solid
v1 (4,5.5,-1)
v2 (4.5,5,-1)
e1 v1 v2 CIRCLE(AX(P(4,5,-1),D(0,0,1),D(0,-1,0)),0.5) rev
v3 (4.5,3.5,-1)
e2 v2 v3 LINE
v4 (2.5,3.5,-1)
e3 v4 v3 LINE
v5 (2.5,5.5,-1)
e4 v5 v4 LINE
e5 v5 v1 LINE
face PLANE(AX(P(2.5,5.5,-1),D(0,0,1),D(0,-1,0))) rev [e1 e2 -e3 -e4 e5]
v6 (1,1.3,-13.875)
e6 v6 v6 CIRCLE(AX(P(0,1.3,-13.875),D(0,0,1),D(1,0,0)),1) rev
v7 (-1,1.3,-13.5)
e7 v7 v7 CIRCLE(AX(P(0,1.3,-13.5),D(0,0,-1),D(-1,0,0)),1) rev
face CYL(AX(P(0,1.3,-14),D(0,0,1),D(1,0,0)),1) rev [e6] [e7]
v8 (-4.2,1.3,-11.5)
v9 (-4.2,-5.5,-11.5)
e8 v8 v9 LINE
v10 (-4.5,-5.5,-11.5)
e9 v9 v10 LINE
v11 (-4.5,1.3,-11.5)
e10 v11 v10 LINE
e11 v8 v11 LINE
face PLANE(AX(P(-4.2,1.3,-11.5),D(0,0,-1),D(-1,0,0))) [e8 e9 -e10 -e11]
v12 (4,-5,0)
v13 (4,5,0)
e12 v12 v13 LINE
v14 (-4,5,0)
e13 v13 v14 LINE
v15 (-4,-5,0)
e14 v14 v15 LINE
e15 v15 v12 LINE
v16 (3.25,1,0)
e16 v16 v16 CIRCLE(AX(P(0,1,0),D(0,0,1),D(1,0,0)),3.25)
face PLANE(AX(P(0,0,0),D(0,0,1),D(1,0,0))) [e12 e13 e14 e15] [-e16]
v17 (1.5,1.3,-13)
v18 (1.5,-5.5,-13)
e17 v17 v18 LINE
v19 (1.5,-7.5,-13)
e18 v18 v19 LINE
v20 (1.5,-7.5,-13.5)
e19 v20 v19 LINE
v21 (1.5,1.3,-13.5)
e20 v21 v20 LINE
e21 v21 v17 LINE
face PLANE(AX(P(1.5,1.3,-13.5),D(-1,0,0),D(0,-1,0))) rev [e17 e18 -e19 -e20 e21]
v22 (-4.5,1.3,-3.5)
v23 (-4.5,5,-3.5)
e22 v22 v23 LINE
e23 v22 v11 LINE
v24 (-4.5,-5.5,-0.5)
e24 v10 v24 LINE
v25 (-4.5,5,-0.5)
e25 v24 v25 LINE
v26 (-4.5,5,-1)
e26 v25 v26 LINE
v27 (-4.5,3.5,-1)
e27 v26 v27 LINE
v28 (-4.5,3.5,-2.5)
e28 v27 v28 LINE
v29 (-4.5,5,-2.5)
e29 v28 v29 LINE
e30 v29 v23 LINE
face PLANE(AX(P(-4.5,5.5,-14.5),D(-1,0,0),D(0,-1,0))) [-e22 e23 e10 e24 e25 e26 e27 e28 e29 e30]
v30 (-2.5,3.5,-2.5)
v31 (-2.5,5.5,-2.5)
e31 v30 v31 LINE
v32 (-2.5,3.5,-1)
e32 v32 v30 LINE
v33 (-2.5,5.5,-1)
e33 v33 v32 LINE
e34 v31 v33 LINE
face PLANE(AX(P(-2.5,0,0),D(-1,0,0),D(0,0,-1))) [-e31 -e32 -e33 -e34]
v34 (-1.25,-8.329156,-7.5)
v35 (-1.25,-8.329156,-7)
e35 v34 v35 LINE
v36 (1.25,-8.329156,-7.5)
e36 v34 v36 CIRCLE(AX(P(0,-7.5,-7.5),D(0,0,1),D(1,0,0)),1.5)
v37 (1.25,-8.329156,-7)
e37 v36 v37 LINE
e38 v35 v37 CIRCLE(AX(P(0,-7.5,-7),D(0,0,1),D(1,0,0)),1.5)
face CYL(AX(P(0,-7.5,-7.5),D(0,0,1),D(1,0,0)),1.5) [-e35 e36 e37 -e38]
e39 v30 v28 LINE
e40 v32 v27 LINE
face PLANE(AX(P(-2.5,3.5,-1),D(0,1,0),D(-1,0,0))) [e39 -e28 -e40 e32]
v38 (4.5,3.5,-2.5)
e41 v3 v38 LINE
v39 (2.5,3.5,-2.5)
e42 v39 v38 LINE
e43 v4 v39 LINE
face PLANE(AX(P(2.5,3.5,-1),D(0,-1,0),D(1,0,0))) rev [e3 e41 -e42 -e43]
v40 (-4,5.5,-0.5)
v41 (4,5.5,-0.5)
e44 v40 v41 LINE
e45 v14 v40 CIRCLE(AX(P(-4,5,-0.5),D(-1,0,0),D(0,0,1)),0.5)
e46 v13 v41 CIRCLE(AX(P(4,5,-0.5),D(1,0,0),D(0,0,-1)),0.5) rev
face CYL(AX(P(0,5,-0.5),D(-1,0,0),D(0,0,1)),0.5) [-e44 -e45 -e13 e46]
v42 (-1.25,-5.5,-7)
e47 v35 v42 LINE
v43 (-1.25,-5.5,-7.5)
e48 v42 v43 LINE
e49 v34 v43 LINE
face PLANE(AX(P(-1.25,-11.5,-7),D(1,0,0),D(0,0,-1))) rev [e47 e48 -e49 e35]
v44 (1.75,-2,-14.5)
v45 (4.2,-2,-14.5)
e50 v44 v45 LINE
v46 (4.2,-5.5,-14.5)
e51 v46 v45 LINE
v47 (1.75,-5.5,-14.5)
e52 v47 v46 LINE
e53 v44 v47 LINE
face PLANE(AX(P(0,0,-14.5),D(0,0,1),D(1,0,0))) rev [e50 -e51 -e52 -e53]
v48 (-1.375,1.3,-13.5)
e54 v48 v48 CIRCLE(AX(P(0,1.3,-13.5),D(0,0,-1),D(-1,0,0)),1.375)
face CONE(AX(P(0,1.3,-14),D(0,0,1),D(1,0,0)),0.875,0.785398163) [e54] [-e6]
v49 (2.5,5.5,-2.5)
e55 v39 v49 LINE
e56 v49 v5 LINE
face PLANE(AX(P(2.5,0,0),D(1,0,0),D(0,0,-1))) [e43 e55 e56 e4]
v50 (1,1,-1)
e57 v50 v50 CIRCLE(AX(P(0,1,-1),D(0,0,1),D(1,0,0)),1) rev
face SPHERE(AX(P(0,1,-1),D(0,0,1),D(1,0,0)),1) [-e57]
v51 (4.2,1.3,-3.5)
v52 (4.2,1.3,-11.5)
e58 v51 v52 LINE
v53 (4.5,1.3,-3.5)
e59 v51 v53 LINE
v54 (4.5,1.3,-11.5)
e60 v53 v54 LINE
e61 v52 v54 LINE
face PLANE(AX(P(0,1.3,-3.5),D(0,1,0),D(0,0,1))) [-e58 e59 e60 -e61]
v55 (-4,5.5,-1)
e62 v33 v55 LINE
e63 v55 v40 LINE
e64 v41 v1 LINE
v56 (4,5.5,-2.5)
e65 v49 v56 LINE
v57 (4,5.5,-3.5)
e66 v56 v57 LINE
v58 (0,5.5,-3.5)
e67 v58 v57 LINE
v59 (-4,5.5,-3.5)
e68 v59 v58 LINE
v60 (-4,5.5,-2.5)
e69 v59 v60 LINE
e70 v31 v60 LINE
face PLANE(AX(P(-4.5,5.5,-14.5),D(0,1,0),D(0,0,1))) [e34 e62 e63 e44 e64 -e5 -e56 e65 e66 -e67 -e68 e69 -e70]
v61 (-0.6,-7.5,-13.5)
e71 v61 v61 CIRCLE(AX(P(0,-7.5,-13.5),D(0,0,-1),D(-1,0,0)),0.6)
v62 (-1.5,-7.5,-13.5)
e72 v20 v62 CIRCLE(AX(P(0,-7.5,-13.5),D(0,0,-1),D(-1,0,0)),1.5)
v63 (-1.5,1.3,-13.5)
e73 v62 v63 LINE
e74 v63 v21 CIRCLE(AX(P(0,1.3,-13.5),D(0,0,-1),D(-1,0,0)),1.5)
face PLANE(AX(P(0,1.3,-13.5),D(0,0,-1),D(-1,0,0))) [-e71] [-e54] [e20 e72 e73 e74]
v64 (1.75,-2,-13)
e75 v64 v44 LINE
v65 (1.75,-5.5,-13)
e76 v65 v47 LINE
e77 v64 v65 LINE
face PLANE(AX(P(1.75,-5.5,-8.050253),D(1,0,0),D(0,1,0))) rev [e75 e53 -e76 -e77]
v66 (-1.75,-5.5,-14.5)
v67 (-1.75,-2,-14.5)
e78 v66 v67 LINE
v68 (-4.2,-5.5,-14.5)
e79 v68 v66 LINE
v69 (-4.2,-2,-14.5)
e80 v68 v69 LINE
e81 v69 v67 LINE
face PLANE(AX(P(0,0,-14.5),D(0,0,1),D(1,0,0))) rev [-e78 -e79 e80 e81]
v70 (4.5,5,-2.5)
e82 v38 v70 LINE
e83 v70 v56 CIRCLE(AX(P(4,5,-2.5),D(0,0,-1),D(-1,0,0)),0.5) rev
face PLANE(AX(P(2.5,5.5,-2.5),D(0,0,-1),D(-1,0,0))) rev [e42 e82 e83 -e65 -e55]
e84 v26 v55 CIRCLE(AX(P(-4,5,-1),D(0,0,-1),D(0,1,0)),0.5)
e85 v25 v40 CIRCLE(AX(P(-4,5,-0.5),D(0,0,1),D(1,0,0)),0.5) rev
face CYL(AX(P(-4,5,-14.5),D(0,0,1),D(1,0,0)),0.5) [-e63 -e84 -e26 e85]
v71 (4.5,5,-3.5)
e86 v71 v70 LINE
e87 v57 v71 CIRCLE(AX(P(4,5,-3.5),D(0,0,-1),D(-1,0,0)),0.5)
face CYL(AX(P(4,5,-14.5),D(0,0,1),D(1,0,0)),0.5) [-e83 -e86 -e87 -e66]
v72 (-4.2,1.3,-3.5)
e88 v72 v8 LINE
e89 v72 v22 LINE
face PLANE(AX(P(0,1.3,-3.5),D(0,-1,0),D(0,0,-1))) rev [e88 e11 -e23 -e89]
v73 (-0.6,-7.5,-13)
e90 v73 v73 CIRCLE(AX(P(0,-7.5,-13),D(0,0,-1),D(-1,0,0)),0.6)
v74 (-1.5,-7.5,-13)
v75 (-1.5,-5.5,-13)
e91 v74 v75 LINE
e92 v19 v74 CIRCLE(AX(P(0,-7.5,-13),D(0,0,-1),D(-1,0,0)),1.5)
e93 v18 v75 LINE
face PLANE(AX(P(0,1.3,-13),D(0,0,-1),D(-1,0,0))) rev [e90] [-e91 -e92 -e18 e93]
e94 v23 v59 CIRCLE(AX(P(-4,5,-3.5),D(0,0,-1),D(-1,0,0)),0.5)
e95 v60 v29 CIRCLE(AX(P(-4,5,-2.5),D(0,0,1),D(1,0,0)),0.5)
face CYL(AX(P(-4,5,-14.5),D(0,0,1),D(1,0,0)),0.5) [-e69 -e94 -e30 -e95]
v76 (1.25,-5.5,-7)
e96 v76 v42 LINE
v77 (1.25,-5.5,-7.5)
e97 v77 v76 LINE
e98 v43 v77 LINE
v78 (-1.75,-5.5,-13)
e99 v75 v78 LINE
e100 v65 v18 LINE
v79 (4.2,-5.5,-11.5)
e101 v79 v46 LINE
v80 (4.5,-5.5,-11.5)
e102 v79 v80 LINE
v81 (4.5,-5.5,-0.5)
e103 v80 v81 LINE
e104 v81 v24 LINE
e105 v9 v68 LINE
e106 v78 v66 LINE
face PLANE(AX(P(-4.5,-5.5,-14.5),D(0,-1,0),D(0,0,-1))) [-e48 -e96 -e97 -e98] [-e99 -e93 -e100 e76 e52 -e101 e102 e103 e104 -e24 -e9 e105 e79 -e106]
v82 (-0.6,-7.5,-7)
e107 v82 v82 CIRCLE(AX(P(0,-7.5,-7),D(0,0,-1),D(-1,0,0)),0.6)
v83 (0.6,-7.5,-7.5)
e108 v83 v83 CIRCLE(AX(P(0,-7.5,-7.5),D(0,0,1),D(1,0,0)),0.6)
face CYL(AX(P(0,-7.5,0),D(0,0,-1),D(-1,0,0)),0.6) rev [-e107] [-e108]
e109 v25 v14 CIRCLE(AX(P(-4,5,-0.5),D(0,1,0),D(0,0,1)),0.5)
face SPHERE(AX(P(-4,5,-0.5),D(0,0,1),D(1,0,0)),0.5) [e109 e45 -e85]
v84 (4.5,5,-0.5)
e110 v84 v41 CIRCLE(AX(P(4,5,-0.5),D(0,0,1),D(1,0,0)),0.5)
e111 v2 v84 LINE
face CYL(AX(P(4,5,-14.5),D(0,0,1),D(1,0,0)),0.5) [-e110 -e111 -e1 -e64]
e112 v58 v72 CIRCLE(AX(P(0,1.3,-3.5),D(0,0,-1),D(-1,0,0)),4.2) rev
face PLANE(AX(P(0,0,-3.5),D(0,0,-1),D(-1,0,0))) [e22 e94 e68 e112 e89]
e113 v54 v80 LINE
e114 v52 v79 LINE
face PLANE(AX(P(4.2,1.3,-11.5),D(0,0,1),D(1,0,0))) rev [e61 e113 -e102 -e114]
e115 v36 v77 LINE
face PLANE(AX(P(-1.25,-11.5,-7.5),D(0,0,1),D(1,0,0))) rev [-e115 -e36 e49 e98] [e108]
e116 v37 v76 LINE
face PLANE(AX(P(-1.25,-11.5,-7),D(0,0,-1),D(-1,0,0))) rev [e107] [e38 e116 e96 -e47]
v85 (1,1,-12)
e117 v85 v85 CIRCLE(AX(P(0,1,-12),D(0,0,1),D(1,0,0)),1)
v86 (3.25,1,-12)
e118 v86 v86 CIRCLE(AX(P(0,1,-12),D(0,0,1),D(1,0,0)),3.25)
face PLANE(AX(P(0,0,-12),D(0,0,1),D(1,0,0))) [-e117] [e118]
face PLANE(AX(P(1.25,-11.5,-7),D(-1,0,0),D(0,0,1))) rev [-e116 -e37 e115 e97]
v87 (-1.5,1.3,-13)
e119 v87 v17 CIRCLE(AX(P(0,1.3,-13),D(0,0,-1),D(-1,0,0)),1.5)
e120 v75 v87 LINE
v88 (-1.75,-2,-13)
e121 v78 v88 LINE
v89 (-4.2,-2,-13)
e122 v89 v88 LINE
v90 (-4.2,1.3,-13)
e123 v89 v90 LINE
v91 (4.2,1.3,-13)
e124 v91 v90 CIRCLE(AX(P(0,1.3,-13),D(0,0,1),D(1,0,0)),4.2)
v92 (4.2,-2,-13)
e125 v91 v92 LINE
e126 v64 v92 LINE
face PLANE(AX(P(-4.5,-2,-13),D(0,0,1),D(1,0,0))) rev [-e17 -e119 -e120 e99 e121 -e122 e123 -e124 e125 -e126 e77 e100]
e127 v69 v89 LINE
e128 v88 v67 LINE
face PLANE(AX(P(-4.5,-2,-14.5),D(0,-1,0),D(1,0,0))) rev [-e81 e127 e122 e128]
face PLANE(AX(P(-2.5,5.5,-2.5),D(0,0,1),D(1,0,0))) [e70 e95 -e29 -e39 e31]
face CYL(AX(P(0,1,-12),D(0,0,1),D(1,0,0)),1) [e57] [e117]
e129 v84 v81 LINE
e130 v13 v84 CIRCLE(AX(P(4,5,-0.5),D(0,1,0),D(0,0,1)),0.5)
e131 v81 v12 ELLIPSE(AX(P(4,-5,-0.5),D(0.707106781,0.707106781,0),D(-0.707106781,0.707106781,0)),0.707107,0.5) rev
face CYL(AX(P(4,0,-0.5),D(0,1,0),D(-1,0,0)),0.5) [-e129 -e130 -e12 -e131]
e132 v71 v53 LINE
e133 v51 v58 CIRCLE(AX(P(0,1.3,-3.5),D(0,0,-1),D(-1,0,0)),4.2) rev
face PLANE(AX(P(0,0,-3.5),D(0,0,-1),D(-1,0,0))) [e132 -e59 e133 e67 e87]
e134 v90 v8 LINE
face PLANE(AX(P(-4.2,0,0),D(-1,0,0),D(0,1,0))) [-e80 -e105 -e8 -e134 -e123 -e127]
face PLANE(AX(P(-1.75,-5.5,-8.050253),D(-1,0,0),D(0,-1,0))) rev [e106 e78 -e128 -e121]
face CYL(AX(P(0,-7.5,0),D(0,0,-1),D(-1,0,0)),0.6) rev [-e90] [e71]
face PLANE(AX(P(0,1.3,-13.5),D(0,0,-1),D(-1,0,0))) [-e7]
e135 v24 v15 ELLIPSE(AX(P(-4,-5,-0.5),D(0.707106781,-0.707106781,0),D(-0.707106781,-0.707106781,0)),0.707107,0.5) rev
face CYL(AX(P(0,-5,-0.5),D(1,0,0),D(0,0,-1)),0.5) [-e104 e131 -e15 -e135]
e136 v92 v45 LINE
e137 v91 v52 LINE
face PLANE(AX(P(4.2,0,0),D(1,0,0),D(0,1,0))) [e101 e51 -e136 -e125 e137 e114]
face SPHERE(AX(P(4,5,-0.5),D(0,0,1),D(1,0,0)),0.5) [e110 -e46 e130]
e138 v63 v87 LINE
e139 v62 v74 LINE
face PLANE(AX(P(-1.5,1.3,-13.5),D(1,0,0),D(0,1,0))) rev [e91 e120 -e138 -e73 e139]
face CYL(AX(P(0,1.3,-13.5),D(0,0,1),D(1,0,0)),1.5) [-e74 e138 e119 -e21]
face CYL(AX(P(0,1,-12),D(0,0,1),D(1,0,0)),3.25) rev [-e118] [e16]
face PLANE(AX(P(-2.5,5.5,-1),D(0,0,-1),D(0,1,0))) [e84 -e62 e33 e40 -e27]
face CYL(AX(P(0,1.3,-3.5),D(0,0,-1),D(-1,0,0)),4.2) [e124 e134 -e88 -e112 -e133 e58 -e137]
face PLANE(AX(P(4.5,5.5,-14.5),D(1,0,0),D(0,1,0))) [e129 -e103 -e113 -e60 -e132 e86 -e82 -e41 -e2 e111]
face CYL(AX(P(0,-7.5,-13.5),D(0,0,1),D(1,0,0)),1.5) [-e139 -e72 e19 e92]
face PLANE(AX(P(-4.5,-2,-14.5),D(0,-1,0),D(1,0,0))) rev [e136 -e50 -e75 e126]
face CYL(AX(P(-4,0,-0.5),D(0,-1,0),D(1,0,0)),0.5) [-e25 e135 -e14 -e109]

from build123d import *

# Parameters (mm, degrees)
SKETCH1_W           = 9
SKETCH1_H           = 11
BOSS_EXTRUDE1_DEPTH = 14.5
CUT_EXTRUDE3_DEPTH  = 11
SKETCH3_W           = 3
SKETCH3_H           = 6.8
CUT_EXTRUDE4_DEPTH  = 0.3
SKETCH5_W           = 1.5
SKETCH5_H           = 7.5
CUT_EXTRUDE5_DEPTH  = 18.781732199
SKETCH6_W           = 3.5
SKETCH6_H           = 3.5
CUT_EXTRUDE6_DEPTH  = 1.5
BOSS_EXTRUDE2_DEPTH = 0.5
SKETCH8_R           = 1.375
SKETCH8_R_2         = 1
BOSS_EXTRUDE3_DEPTH = 0.5
CHAMFER1_SIZE       = 0.5
SKETCH9_W           = 2.5
SKETCH9_H           = 0.5
BOSS_EXTRUDE4_DEPTH = 6
CUT_EXTRUDE8_DEPTH  = 0.5
SKETCH11_R          = 0.6
CUT_EXTRUDE9_DEPTH  = 17.83745824
SKETCH12_W          = 1.5
SKETCH12_H          = 2
CUT_EXTRUDE10_DEPTH = 2
SKETCH13_R          = 3.25
SKETCH13_R_2        = 1
CUT_EXTRUDE11_DEPTH = 12
FILLET1_R           = 1
FILLET2_R           = 0.5


with BuildPart() as part:
    # Sketch1 → Boss-Extrude1 (new body)
    with BuildSketch(Plane.XY):
        Rectangle(SKETCH1_W, SKETCH1_H)
    extrude(amount=-BOSS_EXTRUDE1_DEPTH)

    # Sketch2 → Cut-Extrude3 (cut)
    with BuildSketch(Plane(origin=(0, 0, -14.5), x_dir=(-1, 0, 0), z_dir=(0, 0, -1))):
        with BuildLine():
            Line((-4.5, 1.3), (-4.2, 1.3))
            ThreePointArc((-4.2, 1.3), (-2.969848481, 4.269848481), (0, 5.5))
            Line((0, 5.5), (-4.5, 5.5))
            Line((-4.5, 5.5), (-4.5, 1.3))
        make_face()
        with BuildLine():
            ThreePointArc((0, 5.5), (2.969848481, 4.269848481), (4.2, 1.3))
            Line((4.2, 1.3), (4.5, 1.3))
            Line((4.5, 1.3), (4.5, 5.5))
            Line((4.5, 5.5), (0, 5.5))
        make_face()
    extrude(amount=-CUT_EXTRUDE3_DEPTH, mode=Mode.SUBTRACT)

    # Sketch3 → Cut-Extrude4 (cut)
    with BuildSketch(Plane(origin=(4.5, 0, 0), x_dir=(0, 0, -1), z_dir=(1, 0, 0))):
        with Locations((13, -2.1)):
            Rectangle(SKETCH3_W, SKETCH3_H)
    cut_extrude4 = extrude(amount=-CUT_EXTRUDE4_DEPTH, mode=Mode.SUBTRACT)

    # Mirror1: Cut-Extrude4 across plane
    add(cut_extrude4.mirror(Plane(origin=(0, 0, 0), x_dir=(0, 0, 1), z_dir=(1, 0, 0))), mode=Mode.SUBTRACT)

    # Sketch5 → Cut-Extrude5 (cut, through all)
    with BuildSketch(Plane(origin=(4.2, 0, 0), x_dir=(0, 0, -1), z_dir=(1, 0, 0))):
        with Locations((13.75, 1.75)):
            Rectangle(SKETCH5_W, SKETCH5_H)
    extrude(amount=-CUT_EXTRUDE5_DEPTH, mode=Mode.SUBTRACT)

    # Sketch6 → Cut-Extrude6 (cut)
    with BuildSketch(Plane(origin=(0, 0, -14.5), x_dir=(-1, 0, 0), z_dir=(0, 0, -1))):
        with Locations((0, -3.75)):
            Rectangle(SKETCH6_W, SKETCH6_H)
    extrude(amount=-CUT_EXTRUDE6_DEPTH, mode=Mode.SUBTRACT)

    # Sketch7 → Boss-Extrude2 (add)
    with BuildSketch(Plane(origin=(0, 0, -13), x_dir=(-1, 0, 0), z_dir=(0, 0, -1))):
        with BuildLine():
            Line((1.5, 1.3), (1.5, -7.5))
            ThreePointArc((1.5, -7.5), (0, -9), (-1.5, -7.5))
            Line((-1.5, -7.5), (-1.5, 1.3))
            ThreePointArc((-1.5, 1.3), (0, 2.8), (1.5, 1.3))
        make_face()
    extrude(amount=BOSS_EXTRUDE2_DEPTH)

    # Sketch8 → Boss-Extrude3 (add)
    with BuildSketch(Plane(origin=(0, 0, -13.5), x_dir=(-1, 0, 0), z_dir=(0, 0, -1))):
        with Locations((0, 1.3)):
            Circle(SKETCH8_R)
        with Locations((0, 1.3)):
            Circle(SKETCH8_R_2, mode=Mode.SUBTRACT)
    extrude(amount=BOSS_EXTRUDE3_DEPTH)

    # Chamfer1
    # the kernel refuses this chamfer: 0.5 mm, written as the material it takes off along each edge
    with BuildSketch(Plane(origin=(0, 1.3, -14), x_dir=(-1, 0, 0), z_dir=(0, -1, 0))) as chamfer1_piece_1_section:
        Polygon((1.375, -CHAMFER1_SIZE), (1.375 - CHAMFER1_SIZE, 0), (1.375, 0), align=None)
    chamfer1_piece_1 = revolve(axis=Axis((0, 1.3, -14), (0, 0, -1)), mode=Mode.PRIVATE)
    chamfer1_piece_1 = split(chamfer1_piece_1, bisect_by=Plane(origin=(1.125101861, 1.3, -13.5), z_dir=(0, 0, -1)), keep=Keep.TOP, mode=Mode.PRIVATE)
    add(chamfer1_piece_1, mode=Mode.SUBTRACT)

    # Sketch9 → Boss-Extrude4 (add)
    with BuildSketch(Plane.XZ.offset(5.5)):
        with Locations((0, -7.25)):
            Rectangle(SKETCH9_W, SKETCH9_H)
    extrude(amount=BOSS_EXTRUDE4_DEPTH)

    # Sketch10 → Cut-Extrude8 (cut)
    with BuildSketch(Plane.XY.offset(-7)):
        with BuildLine():
            ThreePointArc((1.25, -8.329156198), (0, -9), (-1.25, -8.329156198))
            Line((-1.25, -8.329156198), (-1.25, -11.5))
            Line((-1.25, -11.5), (1.25, -11.5))
            Line((1.25, -11.5), (1.25, -8.329156198))
        make_face()
    extrude(amount=-CUT_EXTRUDE8_DEPTH, mode=Mode.SUBTRACT)

    # Sketch11 → Cut-Extrude9 (cut, through all)
    with BuildSketch(Plane(origin=(0, 0, -13.5), x_dir=(-1, 0, 0), z_dir=(0, 0, -1))):
        with Locations((0, -7.5)):
            Circle(SKETCH11_R)
    extrude(amount=-CUT_EXTRUDE9_DEPTH, mode=Mode.SUBTRACT)

    # Sketch12 → Cut-Extrude10 (cut)
    with BuildSketch(Plane(origin=(4.5, 0, 0), x_dir=(0, 0, -1), z_dir=(1, 0, 0))):
        with Locations((1.75, 4.5)):
            Rectangle(SKETCH12_W, SKETCH12_H)
    cut_extrude10 = extrude(amount=-CUT_EXTRUDE10_DEPTH, mode=Mode.SUBTRACT)

    # Mirror2: Cut-Extrude10 across plane
    add(cut_extrude10.mirror(Plane(origin=(0, 0, 0), x_dir=(0, 0, 1), z_dir=(1, 0, 0))), mode=Mode.SUBTRACT)

    # Sketch13 → Cut-Extrude11 (cut)
    with BuildSketch(Plane.XY):
        with Locations((0, 1)):
            Circle(SKETCH13_R)
        with Locations((0, 1)):
            Circle(SKETCH13_R_2, mode=Mode.SUBTRACT)
    extrude(amount=-CUT_EXTRUDE11_DEPTH, mode=Mode.SUBTRACT)

    # Fillet1
    fillet1_edges = [part.edges().sort_by_distance(p)[0] for p in [
        (-1, 1, 0),
    ]]
    fillet(fillet1_edges, radius=FILLET1_R)

    # Fillet2
    fillet2_edges = [part.edges().sort_by_distance(p)[0] for p in [
        (4.5, 5.5, -3),
        (4.5, 5.5, -0.5),
        (-4.5, 5.5, -0.5),
        (-4.5, 5.5, -3),
        (0, -5.5, 0),
        (-4.5, 0, 0),
        (0, 5.5, 0),
        (4.5, 0, 0),
    ]]
    fillet(fillet2_edges, radius=FILLET2_R)


solid = part.part
